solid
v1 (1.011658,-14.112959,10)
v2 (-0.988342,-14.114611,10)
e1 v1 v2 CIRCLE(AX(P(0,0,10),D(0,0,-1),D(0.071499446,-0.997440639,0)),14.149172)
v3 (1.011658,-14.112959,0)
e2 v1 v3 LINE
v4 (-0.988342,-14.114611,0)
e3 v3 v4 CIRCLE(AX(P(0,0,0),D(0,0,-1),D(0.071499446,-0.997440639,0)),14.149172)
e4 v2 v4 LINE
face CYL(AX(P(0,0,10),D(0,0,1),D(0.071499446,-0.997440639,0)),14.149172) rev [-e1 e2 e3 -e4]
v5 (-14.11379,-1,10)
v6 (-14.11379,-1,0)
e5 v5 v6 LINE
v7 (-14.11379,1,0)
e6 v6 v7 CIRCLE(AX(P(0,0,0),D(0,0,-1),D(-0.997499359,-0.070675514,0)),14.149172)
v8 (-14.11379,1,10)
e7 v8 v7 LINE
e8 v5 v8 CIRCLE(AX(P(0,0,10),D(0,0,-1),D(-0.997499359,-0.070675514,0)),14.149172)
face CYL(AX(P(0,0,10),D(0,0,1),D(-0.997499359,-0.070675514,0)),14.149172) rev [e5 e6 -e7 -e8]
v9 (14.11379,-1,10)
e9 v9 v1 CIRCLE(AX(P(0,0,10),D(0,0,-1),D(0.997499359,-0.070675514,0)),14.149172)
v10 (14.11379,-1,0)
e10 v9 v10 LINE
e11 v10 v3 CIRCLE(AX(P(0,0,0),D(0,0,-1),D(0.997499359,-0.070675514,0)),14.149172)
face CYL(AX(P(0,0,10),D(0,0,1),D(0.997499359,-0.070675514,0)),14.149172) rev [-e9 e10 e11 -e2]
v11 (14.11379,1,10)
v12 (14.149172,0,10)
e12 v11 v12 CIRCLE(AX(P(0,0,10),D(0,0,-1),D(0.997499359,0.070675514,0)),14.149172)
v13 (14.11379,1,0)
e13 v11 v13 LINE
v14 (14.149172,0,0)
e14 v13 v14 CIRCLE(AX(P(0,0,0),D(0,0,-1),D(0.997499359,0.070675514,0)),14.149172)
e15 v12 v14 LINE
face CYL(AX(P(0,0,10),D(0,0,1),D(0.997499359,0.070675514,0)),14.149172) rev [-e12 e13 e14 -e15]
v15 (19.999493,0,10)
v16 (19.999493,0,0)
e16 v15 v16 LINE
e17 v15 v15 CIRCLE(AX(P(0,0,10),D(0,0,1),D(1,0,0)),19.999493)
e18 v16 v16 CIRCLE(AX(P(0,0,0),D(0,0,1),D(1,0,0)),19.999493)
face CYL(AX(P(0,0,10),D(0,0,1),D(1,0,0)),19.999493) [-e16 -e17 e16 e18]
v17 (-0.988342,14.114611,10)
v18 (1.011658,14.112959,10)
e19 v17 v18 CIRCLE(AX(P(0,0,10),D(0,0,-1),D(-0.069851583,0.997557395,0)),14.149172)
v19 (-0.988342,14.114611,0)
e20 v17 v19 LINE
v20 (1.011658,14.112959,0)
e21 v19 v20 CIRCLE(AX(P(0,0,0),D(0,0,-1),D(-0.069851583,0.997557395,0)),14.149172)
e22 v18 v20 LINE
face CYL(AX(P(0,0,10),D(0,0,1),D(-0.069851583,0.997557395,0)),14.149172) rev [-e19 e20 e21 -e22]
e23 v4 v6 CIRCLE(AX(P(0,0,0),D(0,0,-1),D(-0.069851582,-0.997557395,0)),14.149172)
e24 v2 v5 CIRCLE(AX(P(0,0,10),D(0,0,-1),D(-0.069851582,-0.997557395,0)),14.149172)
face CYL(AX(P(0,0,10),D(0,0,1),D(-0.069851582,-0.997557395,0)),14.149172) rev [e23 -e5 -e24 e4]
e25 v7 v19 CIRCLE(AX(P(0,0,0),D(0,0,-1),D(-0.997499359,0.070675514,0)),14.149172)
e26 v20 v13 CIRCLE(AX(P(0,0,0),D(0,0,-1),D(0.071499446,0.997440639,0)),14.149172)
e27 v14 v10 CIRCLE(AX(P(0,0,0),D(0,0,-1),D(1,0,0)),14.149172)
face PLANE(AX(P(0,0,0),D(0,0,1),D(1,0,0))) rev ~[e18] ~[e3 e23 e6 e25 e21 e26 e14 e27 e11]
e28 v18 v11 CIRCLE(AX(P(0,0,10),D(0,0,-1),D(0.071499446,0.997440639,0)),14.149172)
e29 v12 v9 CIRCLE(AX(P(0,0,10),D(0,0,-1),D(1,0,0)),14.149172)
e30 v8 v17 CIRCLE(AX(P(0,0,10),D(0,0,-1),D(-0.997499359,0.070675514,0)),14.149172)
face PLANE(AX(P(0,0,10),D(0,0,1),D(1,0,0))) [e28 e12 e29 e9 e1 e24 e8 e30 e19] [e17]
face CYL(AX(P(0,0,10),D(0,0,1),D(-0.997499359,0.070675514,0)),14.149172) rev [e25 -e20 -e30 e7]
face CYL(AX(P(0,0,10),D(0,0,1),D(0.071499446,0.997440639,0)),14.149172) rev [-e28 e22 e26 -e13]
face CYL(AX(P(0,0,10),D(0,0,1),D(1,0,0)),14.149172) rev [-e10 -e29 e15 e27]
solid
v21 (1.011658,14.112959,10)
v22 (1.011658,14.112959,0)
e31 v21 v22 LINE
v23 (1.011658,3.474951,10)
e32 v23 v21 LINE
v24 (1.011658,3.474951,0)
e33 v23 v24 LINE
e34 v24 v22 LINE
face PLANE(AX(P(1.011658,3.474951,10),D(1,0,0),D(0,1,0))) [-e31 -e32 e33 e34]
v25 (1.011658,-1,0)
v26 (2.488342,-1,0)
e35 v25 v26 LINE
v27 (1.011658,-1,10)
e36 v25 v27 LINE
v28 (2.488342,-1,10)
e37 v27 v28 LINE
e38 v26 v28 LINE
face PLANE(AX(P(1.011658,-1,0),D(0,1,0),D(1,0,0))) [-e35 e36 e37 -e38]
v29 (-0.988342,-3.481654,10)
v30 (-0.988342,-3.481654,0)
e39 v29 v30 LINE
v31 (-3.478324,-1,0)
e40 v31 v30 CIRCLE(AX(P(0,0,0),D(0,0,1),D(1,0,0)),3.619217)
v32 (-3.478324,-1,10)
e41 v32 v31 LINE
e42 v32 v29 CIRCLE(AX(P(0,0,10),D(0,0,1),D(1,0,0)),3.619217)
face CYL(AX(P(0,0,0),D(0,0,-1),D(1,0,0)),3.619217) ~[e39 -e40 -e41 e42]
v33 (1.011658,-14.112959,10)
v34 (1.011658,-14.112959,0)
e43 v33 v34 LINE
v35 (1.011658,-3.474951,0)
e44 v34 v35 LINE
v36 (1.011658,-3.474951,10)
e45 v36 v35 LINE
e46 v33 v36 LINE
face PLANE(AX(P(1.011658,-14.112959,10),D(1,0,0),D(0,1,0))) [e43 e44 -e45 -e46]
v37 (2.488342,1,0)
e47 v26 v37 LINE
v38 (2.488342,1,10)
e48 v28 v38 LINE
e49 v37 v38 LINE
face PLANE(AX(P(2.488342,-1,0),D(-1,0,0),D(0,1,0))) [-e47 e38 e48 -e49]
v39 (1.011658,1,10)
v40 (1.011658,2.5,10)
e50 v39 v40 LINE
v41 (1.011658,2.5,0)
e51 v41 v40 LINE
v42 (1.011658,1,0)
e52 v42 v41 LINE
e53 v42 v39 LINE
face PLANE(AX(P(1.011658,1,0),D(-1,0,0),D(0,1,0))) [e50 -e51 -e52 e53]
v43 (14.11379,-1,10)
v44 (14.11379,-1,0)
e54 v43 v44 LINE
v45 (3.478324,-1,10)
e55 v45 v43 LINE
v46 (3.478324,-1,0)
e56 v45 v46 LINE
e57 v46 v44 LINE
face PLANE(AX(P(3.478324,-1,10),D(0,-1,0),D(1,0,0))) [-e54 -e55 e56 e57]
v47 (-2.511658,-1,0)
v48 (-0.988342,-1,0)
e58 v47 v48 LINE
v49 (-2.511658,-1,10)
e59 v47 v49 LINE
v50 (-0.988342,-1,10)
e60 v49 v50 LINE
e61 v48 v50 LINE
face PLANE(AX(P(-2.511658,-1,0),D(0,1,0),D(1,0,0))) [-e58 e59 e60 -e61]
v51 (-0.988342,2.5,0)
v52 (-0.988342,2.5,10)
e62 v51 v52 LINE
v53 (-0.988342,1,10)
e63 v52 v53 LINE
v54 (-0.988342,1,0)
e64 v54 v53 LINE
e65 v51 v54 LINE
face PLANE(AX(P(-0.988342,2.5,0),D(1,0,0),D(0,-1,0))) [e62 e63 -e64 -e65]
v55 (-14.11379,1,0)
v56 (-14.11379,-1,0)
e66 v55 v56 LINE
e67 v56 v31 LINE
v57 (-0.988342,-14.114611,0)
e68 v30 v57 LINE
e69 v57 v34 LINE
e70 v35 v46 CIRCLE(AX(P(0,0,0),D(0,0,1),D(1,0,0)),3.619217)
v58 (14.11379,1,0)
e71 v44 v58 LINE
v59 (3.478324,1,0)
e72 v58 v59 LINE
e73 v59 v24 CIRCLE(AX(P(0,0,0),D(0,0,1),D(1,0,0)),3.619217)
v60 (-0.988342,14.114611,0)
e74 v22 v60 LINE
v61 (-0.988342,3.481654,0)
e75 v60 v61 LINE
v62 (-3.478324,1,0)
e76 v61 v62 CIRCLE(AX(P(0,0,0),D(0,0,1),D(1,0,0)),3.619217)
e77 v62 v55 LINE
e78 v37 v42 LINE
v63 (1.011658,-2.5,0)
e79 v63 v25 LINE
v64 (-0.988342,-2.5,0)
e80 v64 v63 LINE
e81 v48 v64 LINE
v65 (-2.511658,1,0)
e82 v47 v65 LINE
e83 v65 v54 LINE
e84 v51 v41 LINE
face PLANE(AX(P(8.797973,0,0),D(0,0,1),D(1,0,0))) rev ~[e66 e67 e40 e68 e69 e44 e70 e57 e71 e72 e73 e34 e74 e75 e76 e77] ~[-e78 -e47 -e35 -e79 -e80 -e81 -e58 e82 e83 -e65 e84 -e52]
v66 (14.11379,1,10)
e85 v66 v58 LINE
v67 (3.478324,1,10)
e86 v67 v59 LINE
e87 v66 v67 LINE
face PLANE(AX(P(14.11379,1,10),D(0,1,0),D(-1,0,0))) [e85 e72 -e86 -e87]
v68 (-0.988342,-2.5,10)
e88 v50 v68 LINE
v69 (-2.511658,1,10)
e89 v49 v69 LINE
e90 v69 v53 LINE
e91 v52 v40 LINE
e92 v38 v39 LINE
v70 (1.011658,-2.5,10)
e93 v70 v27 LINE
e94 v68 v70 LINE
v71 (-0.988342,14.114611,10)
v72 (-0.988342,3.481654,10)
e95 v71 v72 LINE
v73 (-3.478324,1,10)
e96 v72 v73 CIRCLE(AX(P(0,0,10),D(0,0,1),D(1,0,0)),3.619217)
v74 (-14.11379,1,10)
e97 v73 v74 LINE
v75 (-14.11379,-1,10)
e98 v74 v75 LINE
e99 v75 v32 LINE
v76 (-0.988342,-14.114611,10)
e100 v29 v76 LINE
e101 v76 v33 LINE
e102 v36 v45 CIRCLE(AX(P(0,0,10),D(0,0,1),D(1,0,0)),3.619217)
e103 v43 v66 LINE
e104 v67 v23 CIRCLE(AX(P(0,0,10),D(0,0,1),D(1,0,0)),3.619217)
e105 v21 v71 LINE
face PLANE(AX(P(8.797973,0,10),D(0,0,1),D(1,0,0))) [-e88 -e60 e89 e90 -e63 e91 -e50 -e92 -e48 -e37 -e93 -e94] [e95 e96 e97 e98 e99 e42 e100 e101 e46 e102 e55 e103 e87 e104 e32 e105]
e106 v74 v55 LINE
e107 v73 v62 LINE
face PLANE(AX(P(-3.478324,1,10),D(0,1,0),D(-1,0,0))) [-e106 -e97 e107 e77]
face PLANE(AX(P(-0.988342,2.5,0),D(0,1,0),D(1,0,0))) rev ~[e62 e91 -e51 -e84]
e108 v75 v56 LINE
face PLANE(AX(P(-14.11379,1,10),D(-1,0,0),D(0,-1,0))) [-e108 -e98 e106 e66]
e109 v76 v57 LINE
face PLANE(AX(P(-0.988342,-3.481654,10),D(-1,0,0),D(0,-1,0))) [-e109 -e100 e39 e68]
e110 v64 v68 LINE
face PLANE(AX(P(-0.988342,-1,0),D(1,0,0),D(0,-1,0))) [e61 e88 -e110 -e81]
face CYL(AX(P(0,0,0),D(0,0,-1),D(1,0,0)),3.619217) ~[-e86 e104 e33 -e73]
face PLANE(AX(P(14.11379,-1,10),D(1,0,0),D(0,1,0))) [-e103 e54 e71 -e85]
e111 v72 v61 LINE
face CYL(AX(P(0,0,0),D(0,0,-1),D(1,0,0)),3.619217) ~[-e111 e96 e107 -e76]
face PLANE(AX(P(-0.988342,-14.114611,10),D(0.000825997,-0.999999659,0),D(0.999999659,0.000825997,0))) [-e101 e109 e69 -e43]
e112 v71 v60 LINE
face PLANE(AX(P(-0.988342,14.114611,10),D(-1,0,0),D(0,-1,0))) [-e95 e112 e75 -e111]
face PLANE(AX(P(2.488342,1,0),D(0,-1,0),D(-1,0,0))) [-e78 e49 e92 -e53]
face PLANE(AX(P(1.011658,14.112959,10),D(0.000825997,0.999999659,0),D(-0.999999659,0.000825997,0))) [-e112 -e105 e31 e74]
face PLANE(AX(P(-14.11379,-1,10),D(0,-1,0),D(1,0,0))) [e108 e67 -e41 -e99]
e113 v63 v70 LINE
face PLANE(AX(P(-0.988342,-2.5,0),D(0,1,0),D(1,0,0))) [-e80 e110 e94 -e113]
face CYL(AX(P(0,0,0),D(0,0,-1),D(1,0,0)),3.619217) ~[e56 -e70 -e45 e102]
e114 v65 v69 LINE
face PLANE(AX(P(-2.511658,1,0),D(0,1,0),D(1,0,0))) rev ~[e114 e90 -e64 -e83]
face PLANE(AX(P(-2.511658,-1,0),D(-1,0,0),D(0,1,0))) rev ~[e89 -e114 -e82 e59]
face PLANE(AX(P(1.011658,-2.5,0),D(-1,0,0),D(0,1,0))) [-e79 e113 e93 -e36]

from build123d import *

# Parameters (mm, degrees)
F1_R     = 3.619217407
F2_DEPTH = 10
F0_W     = 2
F0_H     = 2
F0_W_2   = 1.4766840935
F0_H_2   = 1.5
F0_W_3   = 1.5233159065
F3_DEPTH = 10
F5_DEPTH = 10
F4_R     = 19.9994931562


# Not quite as in the source:
# - a feature names something its author has since deleted; it is built from what else it names


with BuildPart() as f2:
    # F1 (on Top) → F2 (new body)
    with BuildSketch(Plane.XY):
        Circle(F1_R)
    extrude(amount=F2_DEPTH)

    # F0 (on Top) → F3 (cut)
    with BuildSketch(Plane.XY):
        with Locations((0.0116579533, 0)):
            Rectangle(F0_W, F0_H)
        with Locations((1.75, 0)):
            Rectangle(F0_W_2, F0_H)
        with Locations((0.0116579533, -1.75)):
            Rectangle(F0_W, F0_H_2)
        with Locations((0.0116579533, 1.75)):
            Rectangle(F0_W, F0_H_2)
        with Locations((-1.75, 0)):
            Rectangle(F0_W_3, F0_H)
    extrude(amount=F3_DEPTH, mode=Mode.SUBTRACT)

    # F4 (on face) → F5 (join)
    with BuildSketch(Plane.XY.offset(10)):
        with BuildLine():
            Line((1.0116579533, 3.4749507658), (1.0116579533, 14.1129590508))
            Line((1.0116579533, 14.1129590508), (-0.9883420467, 14.1146110461))
            Line((-0.9883420467, 14.1146110461), (-0.9883420467, 3.4816540089))
            ThreePointArc((-0.9883420467, 3.4816540089), (0.0121301789, 3.6191970791), (1.0116579533, 3.4749507658))
        make_face()
        with BuildLine():
            Line((14.1137898874, -1), (14.1137898874, 1))
            Line((14.1137898874, 1), (3.4783235385, 1))
            ThreePointArc((3.4783235385, 1), (3.5838208477, 0.5049383829), (3.619217407, 0))
            ThreePointArc((3.619217407, 0), (3.5838208477, -0.5049383829), (3.4783235385, -1))
            Line((3.4783235385, -1), (14.1137898874, -1))
        make_face()
        with BuildLine():
            Line((-0.9883420467, -14.1146110461), (1.0116579533, -14.1129590508))
            Line((1.0116579533, -14.1129590508), (1.0116579533, -3.4749507658))
            ThreePointArc((1.0116579533, -3.4749507658), (0.0121301789, -3.6191970791), (-0.9883420467, -3.4816540089))
            Line((-0.9883420467, -3.4816540089), (-0.9883420467, -14.1146110461))
        make_face()
        with BuildLine():
            Line((-3.4783235385, 1), (-14.1137898874, 1))
            Line((-14.1137898874, 1), (-14.1137898874, -1))
            Line((-14.1137898874, -1), (-3.4783235385, -1))
            ThreePointArc((-3.4783235385, -1), (-3.619217407, 0), (-3.4783235385, 1))
        make_face()
    extrude(amount=-F5_DEPTH)

    # F4 (on face) → F5, piece 2 (join)
    with BuildSketch(Plane.XY.offset(10)):
        Circle(F4_R)
        with BuildLine():
            ThreePointArc((14.1137898874, 1), (14.1403236177, 0.5003128735), (14.1491718833, 0))
            ThreePointArc((14.1491718833, 0), (14.1403236177, -0.5003128735), (14.1137898874, -1))
            ThreePointArc((14.1137898874, -1), (10.0091066965, -10.0008423706), (1.0116579533, -14.1129590508))
            ThreePointArc((1.0116579533, -14.1129590508), (0.0116871787, -14.1491670566), (-0.9883420467, -14.1146110461))
            ThreePointArc((-0.9883420467, -14.1146110461), (-10.0008426126, -10.0091064548), (-14.1137898874, -1))
            ThreePointArc((-14.1137898874, -1), (-14.1491718833, 0), (-14.1137898874, 1))
            ThreePointArc((-14.1137898874, 1), (-10.0008426126, 10.0091064548), (-0.9883420467, 14.1146110461))
            ThreePointArc((-0.9883420467, 14.1146110461), (0.0116871787, 14.1491670566), (1.0116579533, 14.1129590508))
            ThreePointArc((1.0116579533, 14.1129590508), (10.0091066965, 10.0008423706), (14.1137898874, 1))
        make_face(mode=Mode.SUBTRACT)
    extrude(amount=-F5_DEPTH)


solid = f2.part
